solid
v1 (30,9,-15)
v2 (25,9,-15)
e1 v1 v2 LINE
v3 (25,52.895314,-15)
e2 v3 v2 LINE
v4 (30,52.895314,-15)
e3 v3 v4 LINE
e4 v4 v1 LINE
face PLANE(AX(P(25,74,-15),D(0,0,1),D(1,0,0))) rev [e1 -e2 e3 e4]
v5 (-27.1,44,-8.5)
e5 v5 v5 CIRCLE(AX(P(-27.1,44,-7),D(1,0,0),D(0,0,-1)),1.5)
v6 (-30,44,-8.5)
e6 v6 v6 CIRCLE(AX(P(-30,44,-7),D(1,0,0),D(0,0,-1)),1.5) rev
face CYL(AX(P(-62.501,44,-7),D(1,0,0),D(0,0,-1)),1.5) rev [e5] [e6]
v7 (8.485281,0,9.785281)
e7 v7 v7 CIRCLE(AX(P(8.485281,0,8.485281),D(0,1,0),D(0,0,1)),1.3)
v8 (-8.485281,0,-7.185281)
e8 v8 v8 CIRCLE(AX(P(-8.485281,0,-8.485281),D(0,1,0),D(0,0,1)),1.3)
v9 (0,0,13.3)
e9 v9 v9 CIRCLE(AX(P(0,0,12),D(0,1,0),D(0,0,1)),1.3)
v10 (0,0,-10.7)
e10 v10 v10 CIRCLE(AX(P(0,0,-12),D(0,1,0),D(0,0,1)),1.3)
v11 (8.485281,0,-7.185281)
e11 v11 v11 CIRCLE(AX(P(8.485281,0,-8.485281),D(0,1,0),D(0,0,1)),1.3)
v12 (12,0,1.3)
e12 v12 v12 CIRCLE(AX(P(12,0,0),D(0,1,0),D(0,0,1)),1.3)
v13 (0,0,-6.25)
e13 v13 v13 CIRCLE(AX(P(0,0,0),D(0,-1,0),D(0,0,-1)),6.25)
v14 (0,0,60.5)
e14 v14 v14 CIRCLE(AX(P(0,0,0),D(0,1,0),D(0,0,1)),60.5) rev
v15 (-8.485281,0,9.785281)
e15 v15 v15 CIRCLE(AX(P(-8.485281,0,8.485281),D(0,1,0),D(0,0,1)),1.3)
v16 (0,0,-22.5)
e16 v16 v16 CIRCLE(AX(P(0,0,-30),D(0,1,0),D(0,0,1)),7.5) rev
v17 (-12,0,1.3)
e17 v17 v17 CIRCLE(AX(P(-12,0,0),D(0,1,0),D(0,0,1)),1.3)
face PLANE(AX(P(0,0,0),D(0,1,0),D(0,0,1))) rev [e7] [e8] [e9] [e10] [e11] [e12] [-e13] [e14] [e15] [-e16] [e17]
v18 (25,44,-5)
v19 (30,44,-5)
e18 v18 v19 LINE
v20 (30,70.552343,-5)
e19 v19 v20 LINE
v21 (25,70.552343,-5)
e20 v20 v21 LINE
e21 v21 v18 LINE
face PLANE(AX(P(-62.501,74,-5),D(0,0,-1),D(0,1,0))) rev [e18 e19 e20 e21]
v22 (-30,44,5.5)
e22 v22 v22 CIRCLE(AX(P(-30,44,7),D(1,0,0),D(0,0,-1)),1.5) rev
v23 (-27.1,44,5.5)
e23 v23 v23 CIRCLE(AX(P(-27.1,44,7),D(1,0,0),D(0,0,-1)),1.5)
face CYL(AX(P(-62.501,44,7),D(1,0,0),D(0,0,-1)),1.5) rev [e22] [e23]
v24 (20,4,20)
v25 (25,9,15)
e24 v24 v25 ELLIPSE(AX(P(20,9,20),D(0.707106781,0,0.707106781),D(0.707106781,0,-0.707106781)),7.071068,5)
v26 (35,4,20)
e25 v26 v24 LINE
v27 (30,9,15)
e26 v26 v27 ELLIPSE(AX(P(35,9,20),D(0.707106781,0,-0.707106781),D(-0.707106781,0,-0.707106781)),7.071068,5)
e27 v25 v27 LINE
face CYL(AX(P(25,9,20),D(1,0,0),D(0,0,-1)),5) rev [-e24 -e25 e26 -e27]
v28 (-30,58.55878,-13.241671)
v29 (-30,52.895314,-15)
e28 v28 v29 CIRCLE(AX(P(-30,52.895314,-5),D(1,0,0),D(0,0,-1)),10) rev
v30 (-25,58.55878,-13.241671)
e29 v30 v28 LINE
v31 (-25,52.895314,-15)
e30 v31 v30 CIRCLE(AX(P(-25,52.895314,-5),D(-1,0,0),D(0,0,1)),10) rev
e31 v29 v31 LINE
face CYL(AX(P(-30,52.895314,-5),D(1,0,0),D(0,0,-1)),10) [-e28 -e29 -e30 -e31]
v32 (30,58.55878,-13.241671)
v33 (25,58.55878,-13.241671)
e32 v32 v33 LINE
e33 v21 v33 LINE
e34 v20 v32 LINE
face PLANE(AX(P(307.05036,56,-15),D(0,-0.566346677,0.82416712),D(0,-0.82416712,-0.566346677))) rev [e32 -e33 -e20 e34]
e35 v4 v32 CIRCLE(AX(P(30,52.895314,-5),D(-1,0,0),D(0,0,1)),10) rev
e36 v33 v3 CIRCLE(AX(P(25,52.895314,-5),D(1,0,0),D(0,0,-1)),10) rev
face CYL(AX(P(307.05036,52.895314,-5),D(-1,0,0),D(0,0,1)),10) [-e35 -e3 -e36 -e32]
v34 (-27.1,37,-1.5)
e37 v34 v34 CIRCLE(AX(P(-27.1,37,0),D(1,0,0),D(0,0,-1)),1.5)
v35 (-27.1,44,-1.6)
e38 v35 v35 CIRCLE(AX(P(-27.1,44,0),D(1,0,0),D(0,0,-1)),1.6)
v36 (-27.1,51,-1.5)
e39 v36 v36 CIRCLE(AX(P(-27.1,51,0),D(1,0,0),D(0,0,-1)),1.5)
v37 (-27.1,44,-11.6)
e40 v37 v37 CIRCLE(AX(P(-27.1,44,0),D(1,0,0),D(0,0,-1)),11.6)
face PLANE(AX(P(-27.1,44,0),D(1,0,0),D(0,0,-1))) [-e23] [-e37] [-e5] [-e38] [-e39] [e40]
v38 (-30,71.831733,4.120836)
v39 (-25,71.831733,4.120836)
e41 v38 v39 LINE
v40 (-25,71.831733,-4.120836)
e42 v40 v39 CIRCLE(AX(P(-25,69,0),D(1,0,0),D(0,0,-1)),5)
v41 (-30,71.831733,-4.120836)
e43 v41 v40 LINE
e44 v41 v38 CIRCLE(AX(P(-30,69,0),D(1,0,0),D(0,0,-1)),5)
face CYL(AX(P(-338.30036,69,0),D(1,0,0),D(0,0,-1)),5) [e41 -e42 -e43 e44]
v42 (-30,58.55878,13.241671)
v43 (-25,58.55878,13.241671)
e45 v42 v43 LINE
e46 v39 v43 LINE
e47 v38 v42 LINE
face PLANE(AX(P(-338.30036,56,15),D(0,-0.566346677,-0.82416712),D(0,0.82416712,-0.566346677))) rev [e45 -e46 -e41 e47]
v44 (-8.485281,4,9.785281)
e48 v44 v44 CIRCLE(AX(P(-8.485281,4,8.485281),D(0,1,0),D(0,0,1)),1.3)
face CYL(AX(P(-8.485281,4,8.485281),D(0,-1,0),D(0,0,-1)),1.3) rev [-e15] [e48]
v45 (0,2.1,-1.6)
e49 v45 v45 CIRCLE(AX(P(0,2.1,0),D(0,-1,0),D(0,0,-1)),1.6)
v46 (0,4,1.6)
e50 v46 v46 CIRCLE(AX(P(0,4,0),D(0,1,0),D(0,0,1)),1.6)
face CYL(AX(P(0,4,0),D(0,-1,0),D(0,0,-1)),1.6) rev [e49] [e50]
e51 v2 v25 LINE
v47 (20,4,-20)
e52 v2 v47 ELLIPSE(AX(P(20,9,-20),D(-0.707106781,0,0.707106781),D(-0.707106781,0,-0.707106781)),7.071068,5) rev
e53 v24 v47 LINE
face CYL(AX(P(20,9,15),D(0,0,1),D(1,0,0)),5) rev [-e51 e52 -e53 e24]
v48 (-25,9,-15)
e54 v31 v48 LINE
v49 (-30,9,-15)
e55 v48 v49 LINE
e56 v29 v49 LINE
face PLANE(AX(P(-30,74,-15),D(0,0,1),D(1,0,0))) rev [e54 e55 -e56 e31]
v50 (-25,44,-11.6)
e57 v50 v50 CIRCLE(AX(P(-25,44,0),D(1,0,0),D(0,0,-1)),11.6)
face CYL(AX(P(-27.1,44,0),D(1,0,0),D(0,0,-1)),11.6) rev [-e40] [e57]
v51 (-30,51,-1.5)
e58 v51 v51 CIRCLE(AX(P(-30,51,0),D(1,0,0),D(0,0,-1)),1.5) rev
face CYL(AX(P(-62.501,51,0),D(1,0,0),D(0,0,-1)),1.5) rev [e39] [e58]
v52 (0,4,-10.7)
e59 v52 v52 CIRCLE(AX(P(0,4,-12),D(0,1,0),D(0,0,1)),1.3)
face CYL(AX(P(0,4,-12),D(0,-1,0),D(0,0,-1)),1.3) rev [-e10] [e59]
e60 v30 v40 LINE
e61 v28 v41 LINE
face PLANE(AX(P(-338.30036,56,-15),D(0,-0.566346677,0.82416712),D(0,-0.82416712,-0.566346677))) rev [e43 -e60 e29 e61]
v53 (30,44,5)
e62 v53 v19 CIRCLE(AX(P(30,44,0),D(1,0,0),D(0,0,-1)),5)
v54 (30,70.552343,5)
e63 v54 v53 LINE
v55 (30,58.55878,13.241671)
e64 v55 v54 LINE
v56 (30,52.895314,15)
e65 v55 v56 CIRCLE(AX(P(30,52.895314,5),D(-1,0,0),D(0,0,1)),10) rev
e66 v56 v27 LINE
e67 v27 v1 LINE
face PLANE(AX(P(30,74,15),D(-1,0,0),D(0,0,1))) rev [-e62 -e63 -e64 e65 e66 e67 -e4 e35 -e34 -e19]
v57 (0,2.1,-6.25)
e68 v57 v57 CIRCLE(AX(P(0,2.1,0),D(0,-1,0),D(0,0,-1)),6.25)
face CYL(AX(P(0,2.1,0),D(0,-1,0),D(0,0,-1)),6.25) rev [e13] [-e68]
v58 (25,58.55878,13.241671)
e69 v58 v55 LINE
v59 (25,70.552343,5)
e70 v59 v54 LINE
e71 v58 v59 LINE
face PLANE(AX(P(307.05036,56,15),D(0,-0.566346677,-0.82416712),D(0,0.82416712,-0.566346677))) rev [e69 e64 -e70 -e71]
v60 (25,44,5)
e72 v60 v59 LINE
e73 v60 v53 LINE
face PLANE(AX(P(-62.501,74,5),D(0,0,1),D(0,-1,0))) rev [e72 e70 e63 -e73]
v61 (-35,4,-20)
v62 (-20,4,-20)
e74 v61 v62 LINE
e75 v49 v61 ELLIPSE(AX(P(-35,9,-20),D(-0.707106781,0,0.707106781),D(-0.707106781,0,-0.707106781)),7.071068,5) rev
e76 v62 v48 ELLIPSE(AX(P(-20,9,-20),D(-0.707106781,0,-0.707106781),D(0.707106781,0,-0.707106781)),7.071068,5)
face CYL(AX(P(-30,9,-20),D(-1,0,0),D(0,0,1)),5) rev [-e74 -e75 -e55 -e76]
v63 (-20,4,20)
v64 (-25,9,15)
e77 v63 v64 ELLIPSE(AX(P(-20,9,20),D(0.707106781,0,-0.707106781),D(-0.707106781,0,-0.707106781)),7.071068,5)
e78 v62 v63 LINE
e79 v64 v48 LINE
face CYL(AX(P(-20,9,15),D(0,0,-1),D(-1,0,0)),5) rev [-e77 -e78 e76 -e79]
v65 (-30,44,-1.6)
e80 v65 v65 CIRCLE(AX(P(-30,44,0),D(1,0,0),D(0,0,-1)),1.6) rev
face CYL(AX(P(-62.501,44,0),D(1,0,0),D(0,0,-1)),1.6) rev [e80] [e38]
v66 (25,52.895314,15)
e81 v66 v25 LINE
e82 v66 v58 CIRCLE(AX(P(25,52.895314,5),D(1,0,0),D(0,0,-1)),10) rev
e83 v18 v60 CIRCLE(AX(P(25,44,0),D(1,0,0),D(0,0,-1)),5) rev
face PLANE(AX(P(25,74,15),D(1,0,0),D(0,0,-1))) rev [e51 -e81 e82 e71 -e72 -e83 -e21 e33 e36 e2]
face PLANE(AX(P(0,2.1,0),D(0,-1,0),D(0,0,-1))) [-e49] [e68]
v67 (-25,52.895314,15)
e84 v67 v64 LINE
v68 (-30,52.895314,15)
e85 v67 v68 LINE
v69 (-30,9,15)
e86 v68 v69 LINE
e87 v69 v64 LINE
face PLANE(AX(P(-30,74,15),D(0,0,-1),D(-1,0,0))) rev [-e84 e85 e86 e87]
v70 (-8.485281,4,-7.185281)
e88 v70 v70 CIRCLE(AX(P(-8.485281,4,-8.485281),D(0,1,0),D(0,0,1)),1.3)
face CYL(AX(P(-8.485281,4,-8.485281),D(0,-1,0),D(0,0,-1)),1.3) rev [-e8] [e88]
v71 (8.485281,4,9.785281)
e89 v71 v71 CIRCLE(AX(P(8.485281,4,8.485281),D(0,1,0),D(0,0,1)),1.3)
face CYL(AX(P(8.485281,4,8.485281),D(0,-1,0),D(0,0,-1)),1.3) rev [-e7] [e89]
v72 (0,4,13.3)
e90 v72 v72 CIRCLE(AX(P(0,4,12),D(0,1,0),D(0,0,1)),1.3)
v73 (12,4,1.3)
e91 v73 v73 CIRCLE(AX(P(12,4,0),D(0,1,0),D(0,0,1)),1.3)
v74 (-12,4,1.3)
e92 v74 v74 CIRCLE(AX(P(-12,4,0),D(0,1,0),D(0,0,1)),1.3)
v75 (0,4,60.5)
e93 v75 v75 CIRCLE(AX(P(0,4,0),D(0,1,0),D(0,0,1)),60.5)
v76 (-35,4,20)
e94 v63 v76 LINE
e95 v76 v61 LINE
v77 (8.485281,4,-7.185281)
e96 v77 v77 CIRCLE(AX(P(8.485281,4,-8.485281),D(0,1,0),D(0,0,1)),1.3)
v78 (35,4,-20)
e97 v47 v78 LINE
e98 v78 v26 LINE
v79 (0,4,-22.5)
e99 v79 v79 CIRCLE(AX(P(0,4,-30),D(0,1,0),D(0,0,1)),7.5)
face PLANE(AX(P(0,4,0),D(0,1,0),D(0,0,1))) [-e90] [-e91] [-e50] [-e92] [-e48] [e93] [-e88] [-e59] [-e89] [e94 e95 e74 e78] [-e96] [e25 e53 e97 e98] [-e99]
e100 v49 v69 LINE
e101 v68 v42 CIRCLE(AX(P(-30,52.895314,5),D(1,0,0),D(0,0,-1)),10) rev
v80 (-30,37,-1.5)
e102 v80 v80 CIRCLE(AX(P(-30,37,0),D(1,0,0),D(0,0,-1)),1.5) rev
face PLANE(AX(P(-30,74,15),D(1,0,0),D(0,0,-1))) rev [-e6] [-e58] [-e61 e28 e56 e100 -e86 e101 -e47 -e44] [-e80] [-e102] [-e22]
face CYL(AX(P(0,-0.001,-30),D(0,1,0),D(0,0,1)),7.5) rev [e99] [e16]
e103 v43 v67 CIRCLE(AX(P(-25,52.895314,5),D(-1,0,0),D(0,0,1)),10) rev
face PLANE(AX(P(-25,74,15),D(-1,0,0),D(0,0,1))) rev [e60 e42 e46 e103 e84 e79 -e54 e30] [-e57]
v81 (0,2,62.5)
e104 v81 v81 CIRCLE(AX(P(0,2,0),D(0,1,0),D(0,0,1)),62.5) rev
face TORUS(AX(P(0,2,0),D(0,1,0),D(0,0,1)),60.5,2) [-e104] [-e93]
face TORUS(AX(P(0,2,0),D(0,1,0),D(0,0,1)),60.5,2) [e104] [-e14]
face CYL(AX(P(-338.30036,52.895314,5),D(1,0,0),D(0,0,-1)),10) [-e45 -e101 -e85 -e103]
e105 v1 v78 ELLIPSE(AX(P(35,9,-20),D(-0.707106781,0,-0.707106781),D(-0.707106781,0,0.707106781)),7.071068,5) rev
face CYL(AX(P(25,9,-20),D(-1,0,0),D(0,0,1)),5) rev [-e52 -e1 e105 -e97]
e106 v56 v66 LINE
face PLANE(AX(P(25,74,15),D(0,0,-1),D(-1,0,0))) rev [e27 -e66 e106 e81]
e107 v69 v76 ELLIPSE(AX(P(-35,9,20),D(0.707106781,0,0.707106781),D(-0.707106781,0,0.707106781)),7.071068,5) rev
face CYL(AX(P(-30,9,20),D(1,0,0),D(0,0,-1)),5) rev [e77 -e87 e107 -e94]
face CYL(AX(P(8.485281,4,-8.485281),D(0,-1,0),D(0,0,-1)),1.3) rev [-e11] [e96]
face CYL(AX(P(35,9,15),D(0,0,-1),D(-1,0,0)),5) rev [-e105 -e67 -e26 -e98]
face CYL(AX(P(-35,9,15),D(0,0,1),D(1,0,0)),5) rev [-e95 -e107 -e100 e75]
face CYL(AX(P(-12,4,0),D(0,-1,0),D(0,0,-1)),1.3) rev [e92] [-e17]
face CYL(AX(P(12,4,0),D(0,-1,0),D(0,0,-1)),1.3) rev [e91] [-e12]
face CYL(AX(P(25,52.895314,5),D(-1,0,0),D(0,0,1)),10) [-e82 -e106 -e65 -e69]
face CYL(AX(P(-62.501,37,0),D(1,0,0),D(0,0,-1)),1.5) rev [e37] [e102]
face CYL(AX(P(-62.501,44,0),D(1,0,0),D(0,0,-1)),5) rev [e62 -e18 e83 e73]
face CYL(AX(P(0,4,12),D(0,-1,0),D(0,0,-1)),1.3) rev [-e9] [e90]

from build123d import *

# Parameters (mm, degrees)
SKETCH1_R           = 62.5
SKETCH1_R_2         = 1.3
SKETCH1_R_3         = 1.6
BOSS_EXTRUDE1_DEPTH = 4
FILLET3_R           = 2
SKETCH4_R           = 6.25
CUT_EXTRUDE3_DEPTH  = 2.1
SKETCH5_W           = 5
SKETCH5_H           = 30
BOSS_EXTRUDE2_DEPTH = 70
CUT_EXTRUDE4_START  = -5
CUT_EXTRUDE4_DEPTH  = 5
FILLET4_R           = 10
CUT_EXTRUDE5_START  = -5
CUT_EXTRUDE5_DEPTH  = 5
FILLET5_R           = 10
SKETCH13_R          = 11.6
CUT_EXTRUDE7_DEPTH  = 2.1
CUT_EXTRUDE8_REACH  = 133.949
SKETCH14_R          = 1.6
SKETCH14_R_2        = 1.5
CUT_EXTRUDE10_REACH = 114.75
SKETCH16_R          = 7.5
CUT_EXTRUDE11_REACH = 135.935
FILLET7_R           = 5


# Read off the part's stored shape, not the designer's step: Cut-Extrude4, Cut-Extrude5
with BuildPart() as part:
    # Sketch1 → Boss-Extrude1 (new body)
    with BuildSketch(Plane(origin=(0, 0, 0), x_dir=(1, 0, 0), z_dir=(0, 1, 0))):
        with Locations(Location((0, 0, 0), (0, 0, 270))):
            Circle(SKETCH1_R)
        with Locations(Location((-12, 0, 0), (0, 0, 270))):
            Circle(SKETCH1_R_2, mode=Mode.SUBTRACT)
        with Locations(Location((-8.485281374, 8.485281374, 0), (0, 0, 270))):
            Circle(SKETCH1_R_2, mode=Mode.SUBTRACT)
        with Locations(Location((0, 12, 0), (0, 0, 270))):
            Circle(SKETCH1_R_2, mode=Mode.SUBTRACT)
        with Locations(Location((8.485281374, 8.485281374, 0), (0, 0, 270))):
            Circle(SKETCH1_R_2, mode=Mode.SUBTRACT)
        with Locations(Location((12, 0, 0), (0, 0, 270))):
            Circle(SKETCH1_R_2, mode=Mode.SUBTRACT)
        with Locations(Location((8.485281374, -8.485281374, 0), (0, 0, 270))):
            Circle(SKETCH1_R_2, mode=Mode.SUBTRACT)
        with Locations(Location((0, -12, 0), (0, 0, 270))):
            Circle(SKETCH1_R_2, mode=Mode.SUBTRACT)
        with Locations(Location((-8.485281374, -8.485281374, 0), (0, 0, 270))):
            Circle(SKETCH1_R_2, mode=Mode.SUBTRACT)
        with Locations(Location((0, 0, 0), (0, 0, 270))):
            Circle(SKETCH1_R_3, mode=Mode.SUBTRACT)
    extrude(amount=BOSS_EXTRUDE1_DEPTH)

    # Fillet3
    fillet3_edges = [part.edges().sort_by_distance(p)[0] for p in [
        (0, 0, -62.5),
        (0, 4, -62.5),
    ]]
    fillet(fillet3_edges, radius=FILLET3_R - 0.0001)  # a hair under: the kernel refuses the full size

    # Sketch4 → Cut-Extrude3 (cut)
    with BuildSketch(Plane.XZ):
        with Locations(Location((0, 0, 0), (0, 0, 270))):
            Circle(SKETCH4_R)
    extrude(amount=-CUT_EXTRUDE3_DEPTH, mode=Mode.SUBTRACT)

    # Sketch5 → Boss-Extrude2 (add)
    with BuildSketch(Plane(origin=(0, 4, 0), x_dir=(1, 0, 0), z_dir=(0, 1, 0))):
        with Locations((-27.5, 0)):
            Rectangle(SKETCH5_W, SKETCH5_H)
        with Locations((27.5, 0)):
            Rectangle(SKETCH5_W, SKETCH5_H)
    extrude(amount=BOSS_EXTRUDE2_DEPTH)

    # Cut-Extrude4 outline → Cut-Extrude4 (cut)
    with BuildSketch(Plane(origin=(30, 0, 0), x_dir=(0, 0, -1), z_dir=(1, 0, 0)).offset(CUT_EXTRUDE4_START)):
        with BuildLine():
            Line((-15, 56), (-4.1208356, 71.831733384))
            ThreePointArc((-4.1208356, 71.831733384), (-2.328232471, 73.424854072), (4.9e-08, 74))
            Line((4.9e-08, 74), (-15, 74))
            Line((-15, 74), (-15, 56))
        make_face()
        with BuildLine():
            Line((15, 74), (4.9e-08, 74))
            ThreePointArc((4.9e-08, 74), (2.328232515, 73.424854049), (4.1208356, 71.831733384))
            Line((4.1208356, 71.831733384), (15, 56))
            Line((15, 56), (15, 74))
        make_face()
    extrude(amount=CUT_EXTRUDE4_DEPTH, mode=Mode.SUBTRACT)

    # Fillet4
    fillet4_edges = [part.edges().sort_by_distance(p)[0] for p in [
        (27.5, 56, 15),
        (27.5, 56, -15),
    ]]
    fillet(fillet4_edges, radius=FILLET4_R)

    # Cut-Extrude5 outline → Cut-Extrude5 (cut)
    with BuildSketch(Plane.ZY.offset(30).offset(CUT_EXTRUDE5_START)):
        with BuildLine():
            Line((-15, 56), (-4.1208356, 71.831733384))
            ThreePointArc((-4.1208356, 71.831733384), (-2.328232471, 73.424854072), (4.9e-08, 74))
            Line((4.9e-08, 74), (-15, 74))
            Line((-15, 74), (-15, 56))
        make_face()
        with BuildLine():
            Line((15, 74), (4.9e-08, 74))
            ThreePointArc((4.9e-08, 74), (2.328232515, 73.424854049), (4.1208356, 71.831733384))
            Line((4.1208356, 71.831733384), (15, 56))
            Line((15, 56), (15, 74))
        make_face()
    extrude(amount=CUT_EXTRUDE5_DEPTH, mode=Mode.SUBTRACT)

    # Fillet5
    fillet5_edges = [part.edges().sort_by_distance(p)[0] for p in [
        (-27.5, 56, -15),
        (-27.5, 56, 15),
    ]]
    fillet(fillet5_edges, radius=FILLET5_R)

    # Sketch13 → Cut-Extrude7 (cut)
    with BuildSketch(Plane(origin=(-25, 0, 0), x_dir=(0, 0, -1), z_dir=(1, 0, 0))):
        with Locations((0, 44)):
            Circle(SKETCH13_R)
    extrude(amount=-CUT_EXTRUDE7_DEPTH, mode=Mode.SUBTRACT)

    # Sketch14 → Cut-Extrude8 (cut, up to next)
    with BuildSketch(Plane(origin=(-27.1, 0, 0), x_dir=(0, 0, -1), z_dir=(1, 0, 0)), mode=Mode.PRIVATE) as cut_extrude8_sk1:
        with Locations((0, 44)):
            Circle(SKETCH14_R)
    cut_extrude8_tool1 = extrude(cut_extrude8_sk1.sketch, amount=-CUT_EXTRUDE8_REACH, mode=Mode.PRIVATE) & part.part
    # Sketch14 → Cut-Extrude8 (cut, up to next)
    with BuildSketch(Plane(origin=(-27.1, 0, 0), x_dir=(0, 0, -1), z_dir=(1, 0, 0)), mode=Mode.PRIVATE) as cut_extrude8_sk2:
        with Locations((0, 51)):
            Circle(SKETCH14_R_2)
    cut_extrude8_tool2 = extrude(cut_extrude8_sk2.sketch, amount=-CUT_EXTRUDE8_REACH, mode=Mode.PRIVATE) & part.part
    # Sketch14 → Cut-Extrude8 (cut, up to next)
    with BuildSketch(Plane(origin=(-27.1, 0, 0), x_dir=(0, 0, -1), z_dir=(1, 0, 0)), mode=Mode.PRIVATE) as cut_extrude8_sk3:
        with Locations((7, 44)):
            Circle(SKETCH14_R_2)
    cut_extrude8_tool3 = extrude(cut_extrude8_sk3.sketch, amount=-CUT_EXTRUDE8_REACH, mode=Mode.PRIVATE) & part.part
    # Sketch14 → Cut-Extrude8 (cut, up to next)
    with BuildSketch(Plane(origin=(-27.1, 0, 0), x_dir=(0, 0, -1), z_dir=(1, 0, 0)), mode=Mode.PRIVATE) as cut_extrude8_sk4:
        with Locations((0, 37)):
            Circle(SKETCH14_R_2)
    cut_extrude8_tool4 = extrude(cut_extrude8_sk4.sketch, amount=-CUT_EXTRUDE8_REACH, mode=Mode.PRIVATE) & part.part
    # Sketch14 → Cut-Extrude8 (cut, up to next)
    with BuildSketch(Plane(origin=(-27.1, 0, 0), x_dir=(0, 0, -1), z_dir=(1, 0, 0)), mode=Mode.PRIVATE) as cut_extrude8_sk5:
        with Locations((-7, 44)):
            Circle(SKETCH14_R_2)
    cut_extrude8_tool5 = extrude(cut_extrude8_sk5.sketch, amount=-CUT_EXTRUDE8_REACH, mode=Mode.PRIVATE) & part.part
    add(cut_extrude8_tool1.solids().sort_by_distance((-27.1, 44, 0))[0], mode=Mode.SUBTRACT)
    add(cut_extrude8_tool2.solids().sort_by_distance((-27.1, 51, 0))[0], mode=Mode.SUBTRACT)
    add(cut_extrude8_tool3.solids().sort_by_distance((-27.1, 44, -7))[0], mode=Mode.SUBTRACT)
    add(cut_extrude8_tool4.solids().sort_by_distance((-27.1, 37, 0))[0], mode=Mode.SUBTRACT)
    add(cut_extrude8_tool5.solids().sort_by_distance((-27.1, 44, 7))[0], mode=Mode.SUBTRACT)

    # Sketch16 → Cut-Extrude10 (cut, up to next)
    with BuildSketch(Plane(origin=(0, 4, 0), x_dir=(1, 0, 0), z_dir=(0, 1, 0)), mode=Mode.PRIVATE) as cut_extrude10_sk1:
        with Locations(Location((0, 30, 0), (0, 0, 270))):
            Circle(SKETCH16_R)
    cut_extrude10_tool1 = extrude(cut_extrude10_sk1.sketch, amount=-CUT_EXTRUDE10_REACH, mode=Mode.PRIVATE) & part.part
    add(cut_extrude10_tool1.solids().sort_by_distance((0, 4, -30))[0], mode=Mode.SUBTRACT)

    # Sketch18 → Cut-Extrude11 (cut, up to next)
    with BuildSketch(Plane(origin=(30, 0, 0), x_dir=(0, 0, -1), z_dir=(1, 0, 0)), mode=Mode.PRIVATE) as cut_extrude11_sk1:
        with BuildLine():
            Line((5, 74), (5, 44))
            ThreePointArc((5, 44), (0, 39), (-5, 44))
            Line((-5, 44), (-5, 74))
            ThreePointArc((-5, 74), (0, 79), (5, 74))
        make_face()
    cut_extrude11_tool1 = extrude(cut_extrude11_sk1.sketch, amount=-CUT_EXTRUDE11_REACH, mode=Mode.PRIVATE) & part.part
    add(cut_extrude11_tool1.solids().sort_by_distance((30, 59, 0))[0], mode=Mode.SUBTRACT)

    # Fillet7
    fillet7_edges = [part.edges().sort_by_distance(p)[0] for p in [
        (-25, 4, 0),
        (-27.5, 4, -15),
        (-30, 4, 0),
        (-27.5, 4, 15),
        (30, 4, 0),
        (27.5, 4, -15),
        (25, 4, 0),
        (27.5, 4, 15),
    ]]
    fillet(fillet7_edges, radius=FILLET7_R)


solid = part.part
